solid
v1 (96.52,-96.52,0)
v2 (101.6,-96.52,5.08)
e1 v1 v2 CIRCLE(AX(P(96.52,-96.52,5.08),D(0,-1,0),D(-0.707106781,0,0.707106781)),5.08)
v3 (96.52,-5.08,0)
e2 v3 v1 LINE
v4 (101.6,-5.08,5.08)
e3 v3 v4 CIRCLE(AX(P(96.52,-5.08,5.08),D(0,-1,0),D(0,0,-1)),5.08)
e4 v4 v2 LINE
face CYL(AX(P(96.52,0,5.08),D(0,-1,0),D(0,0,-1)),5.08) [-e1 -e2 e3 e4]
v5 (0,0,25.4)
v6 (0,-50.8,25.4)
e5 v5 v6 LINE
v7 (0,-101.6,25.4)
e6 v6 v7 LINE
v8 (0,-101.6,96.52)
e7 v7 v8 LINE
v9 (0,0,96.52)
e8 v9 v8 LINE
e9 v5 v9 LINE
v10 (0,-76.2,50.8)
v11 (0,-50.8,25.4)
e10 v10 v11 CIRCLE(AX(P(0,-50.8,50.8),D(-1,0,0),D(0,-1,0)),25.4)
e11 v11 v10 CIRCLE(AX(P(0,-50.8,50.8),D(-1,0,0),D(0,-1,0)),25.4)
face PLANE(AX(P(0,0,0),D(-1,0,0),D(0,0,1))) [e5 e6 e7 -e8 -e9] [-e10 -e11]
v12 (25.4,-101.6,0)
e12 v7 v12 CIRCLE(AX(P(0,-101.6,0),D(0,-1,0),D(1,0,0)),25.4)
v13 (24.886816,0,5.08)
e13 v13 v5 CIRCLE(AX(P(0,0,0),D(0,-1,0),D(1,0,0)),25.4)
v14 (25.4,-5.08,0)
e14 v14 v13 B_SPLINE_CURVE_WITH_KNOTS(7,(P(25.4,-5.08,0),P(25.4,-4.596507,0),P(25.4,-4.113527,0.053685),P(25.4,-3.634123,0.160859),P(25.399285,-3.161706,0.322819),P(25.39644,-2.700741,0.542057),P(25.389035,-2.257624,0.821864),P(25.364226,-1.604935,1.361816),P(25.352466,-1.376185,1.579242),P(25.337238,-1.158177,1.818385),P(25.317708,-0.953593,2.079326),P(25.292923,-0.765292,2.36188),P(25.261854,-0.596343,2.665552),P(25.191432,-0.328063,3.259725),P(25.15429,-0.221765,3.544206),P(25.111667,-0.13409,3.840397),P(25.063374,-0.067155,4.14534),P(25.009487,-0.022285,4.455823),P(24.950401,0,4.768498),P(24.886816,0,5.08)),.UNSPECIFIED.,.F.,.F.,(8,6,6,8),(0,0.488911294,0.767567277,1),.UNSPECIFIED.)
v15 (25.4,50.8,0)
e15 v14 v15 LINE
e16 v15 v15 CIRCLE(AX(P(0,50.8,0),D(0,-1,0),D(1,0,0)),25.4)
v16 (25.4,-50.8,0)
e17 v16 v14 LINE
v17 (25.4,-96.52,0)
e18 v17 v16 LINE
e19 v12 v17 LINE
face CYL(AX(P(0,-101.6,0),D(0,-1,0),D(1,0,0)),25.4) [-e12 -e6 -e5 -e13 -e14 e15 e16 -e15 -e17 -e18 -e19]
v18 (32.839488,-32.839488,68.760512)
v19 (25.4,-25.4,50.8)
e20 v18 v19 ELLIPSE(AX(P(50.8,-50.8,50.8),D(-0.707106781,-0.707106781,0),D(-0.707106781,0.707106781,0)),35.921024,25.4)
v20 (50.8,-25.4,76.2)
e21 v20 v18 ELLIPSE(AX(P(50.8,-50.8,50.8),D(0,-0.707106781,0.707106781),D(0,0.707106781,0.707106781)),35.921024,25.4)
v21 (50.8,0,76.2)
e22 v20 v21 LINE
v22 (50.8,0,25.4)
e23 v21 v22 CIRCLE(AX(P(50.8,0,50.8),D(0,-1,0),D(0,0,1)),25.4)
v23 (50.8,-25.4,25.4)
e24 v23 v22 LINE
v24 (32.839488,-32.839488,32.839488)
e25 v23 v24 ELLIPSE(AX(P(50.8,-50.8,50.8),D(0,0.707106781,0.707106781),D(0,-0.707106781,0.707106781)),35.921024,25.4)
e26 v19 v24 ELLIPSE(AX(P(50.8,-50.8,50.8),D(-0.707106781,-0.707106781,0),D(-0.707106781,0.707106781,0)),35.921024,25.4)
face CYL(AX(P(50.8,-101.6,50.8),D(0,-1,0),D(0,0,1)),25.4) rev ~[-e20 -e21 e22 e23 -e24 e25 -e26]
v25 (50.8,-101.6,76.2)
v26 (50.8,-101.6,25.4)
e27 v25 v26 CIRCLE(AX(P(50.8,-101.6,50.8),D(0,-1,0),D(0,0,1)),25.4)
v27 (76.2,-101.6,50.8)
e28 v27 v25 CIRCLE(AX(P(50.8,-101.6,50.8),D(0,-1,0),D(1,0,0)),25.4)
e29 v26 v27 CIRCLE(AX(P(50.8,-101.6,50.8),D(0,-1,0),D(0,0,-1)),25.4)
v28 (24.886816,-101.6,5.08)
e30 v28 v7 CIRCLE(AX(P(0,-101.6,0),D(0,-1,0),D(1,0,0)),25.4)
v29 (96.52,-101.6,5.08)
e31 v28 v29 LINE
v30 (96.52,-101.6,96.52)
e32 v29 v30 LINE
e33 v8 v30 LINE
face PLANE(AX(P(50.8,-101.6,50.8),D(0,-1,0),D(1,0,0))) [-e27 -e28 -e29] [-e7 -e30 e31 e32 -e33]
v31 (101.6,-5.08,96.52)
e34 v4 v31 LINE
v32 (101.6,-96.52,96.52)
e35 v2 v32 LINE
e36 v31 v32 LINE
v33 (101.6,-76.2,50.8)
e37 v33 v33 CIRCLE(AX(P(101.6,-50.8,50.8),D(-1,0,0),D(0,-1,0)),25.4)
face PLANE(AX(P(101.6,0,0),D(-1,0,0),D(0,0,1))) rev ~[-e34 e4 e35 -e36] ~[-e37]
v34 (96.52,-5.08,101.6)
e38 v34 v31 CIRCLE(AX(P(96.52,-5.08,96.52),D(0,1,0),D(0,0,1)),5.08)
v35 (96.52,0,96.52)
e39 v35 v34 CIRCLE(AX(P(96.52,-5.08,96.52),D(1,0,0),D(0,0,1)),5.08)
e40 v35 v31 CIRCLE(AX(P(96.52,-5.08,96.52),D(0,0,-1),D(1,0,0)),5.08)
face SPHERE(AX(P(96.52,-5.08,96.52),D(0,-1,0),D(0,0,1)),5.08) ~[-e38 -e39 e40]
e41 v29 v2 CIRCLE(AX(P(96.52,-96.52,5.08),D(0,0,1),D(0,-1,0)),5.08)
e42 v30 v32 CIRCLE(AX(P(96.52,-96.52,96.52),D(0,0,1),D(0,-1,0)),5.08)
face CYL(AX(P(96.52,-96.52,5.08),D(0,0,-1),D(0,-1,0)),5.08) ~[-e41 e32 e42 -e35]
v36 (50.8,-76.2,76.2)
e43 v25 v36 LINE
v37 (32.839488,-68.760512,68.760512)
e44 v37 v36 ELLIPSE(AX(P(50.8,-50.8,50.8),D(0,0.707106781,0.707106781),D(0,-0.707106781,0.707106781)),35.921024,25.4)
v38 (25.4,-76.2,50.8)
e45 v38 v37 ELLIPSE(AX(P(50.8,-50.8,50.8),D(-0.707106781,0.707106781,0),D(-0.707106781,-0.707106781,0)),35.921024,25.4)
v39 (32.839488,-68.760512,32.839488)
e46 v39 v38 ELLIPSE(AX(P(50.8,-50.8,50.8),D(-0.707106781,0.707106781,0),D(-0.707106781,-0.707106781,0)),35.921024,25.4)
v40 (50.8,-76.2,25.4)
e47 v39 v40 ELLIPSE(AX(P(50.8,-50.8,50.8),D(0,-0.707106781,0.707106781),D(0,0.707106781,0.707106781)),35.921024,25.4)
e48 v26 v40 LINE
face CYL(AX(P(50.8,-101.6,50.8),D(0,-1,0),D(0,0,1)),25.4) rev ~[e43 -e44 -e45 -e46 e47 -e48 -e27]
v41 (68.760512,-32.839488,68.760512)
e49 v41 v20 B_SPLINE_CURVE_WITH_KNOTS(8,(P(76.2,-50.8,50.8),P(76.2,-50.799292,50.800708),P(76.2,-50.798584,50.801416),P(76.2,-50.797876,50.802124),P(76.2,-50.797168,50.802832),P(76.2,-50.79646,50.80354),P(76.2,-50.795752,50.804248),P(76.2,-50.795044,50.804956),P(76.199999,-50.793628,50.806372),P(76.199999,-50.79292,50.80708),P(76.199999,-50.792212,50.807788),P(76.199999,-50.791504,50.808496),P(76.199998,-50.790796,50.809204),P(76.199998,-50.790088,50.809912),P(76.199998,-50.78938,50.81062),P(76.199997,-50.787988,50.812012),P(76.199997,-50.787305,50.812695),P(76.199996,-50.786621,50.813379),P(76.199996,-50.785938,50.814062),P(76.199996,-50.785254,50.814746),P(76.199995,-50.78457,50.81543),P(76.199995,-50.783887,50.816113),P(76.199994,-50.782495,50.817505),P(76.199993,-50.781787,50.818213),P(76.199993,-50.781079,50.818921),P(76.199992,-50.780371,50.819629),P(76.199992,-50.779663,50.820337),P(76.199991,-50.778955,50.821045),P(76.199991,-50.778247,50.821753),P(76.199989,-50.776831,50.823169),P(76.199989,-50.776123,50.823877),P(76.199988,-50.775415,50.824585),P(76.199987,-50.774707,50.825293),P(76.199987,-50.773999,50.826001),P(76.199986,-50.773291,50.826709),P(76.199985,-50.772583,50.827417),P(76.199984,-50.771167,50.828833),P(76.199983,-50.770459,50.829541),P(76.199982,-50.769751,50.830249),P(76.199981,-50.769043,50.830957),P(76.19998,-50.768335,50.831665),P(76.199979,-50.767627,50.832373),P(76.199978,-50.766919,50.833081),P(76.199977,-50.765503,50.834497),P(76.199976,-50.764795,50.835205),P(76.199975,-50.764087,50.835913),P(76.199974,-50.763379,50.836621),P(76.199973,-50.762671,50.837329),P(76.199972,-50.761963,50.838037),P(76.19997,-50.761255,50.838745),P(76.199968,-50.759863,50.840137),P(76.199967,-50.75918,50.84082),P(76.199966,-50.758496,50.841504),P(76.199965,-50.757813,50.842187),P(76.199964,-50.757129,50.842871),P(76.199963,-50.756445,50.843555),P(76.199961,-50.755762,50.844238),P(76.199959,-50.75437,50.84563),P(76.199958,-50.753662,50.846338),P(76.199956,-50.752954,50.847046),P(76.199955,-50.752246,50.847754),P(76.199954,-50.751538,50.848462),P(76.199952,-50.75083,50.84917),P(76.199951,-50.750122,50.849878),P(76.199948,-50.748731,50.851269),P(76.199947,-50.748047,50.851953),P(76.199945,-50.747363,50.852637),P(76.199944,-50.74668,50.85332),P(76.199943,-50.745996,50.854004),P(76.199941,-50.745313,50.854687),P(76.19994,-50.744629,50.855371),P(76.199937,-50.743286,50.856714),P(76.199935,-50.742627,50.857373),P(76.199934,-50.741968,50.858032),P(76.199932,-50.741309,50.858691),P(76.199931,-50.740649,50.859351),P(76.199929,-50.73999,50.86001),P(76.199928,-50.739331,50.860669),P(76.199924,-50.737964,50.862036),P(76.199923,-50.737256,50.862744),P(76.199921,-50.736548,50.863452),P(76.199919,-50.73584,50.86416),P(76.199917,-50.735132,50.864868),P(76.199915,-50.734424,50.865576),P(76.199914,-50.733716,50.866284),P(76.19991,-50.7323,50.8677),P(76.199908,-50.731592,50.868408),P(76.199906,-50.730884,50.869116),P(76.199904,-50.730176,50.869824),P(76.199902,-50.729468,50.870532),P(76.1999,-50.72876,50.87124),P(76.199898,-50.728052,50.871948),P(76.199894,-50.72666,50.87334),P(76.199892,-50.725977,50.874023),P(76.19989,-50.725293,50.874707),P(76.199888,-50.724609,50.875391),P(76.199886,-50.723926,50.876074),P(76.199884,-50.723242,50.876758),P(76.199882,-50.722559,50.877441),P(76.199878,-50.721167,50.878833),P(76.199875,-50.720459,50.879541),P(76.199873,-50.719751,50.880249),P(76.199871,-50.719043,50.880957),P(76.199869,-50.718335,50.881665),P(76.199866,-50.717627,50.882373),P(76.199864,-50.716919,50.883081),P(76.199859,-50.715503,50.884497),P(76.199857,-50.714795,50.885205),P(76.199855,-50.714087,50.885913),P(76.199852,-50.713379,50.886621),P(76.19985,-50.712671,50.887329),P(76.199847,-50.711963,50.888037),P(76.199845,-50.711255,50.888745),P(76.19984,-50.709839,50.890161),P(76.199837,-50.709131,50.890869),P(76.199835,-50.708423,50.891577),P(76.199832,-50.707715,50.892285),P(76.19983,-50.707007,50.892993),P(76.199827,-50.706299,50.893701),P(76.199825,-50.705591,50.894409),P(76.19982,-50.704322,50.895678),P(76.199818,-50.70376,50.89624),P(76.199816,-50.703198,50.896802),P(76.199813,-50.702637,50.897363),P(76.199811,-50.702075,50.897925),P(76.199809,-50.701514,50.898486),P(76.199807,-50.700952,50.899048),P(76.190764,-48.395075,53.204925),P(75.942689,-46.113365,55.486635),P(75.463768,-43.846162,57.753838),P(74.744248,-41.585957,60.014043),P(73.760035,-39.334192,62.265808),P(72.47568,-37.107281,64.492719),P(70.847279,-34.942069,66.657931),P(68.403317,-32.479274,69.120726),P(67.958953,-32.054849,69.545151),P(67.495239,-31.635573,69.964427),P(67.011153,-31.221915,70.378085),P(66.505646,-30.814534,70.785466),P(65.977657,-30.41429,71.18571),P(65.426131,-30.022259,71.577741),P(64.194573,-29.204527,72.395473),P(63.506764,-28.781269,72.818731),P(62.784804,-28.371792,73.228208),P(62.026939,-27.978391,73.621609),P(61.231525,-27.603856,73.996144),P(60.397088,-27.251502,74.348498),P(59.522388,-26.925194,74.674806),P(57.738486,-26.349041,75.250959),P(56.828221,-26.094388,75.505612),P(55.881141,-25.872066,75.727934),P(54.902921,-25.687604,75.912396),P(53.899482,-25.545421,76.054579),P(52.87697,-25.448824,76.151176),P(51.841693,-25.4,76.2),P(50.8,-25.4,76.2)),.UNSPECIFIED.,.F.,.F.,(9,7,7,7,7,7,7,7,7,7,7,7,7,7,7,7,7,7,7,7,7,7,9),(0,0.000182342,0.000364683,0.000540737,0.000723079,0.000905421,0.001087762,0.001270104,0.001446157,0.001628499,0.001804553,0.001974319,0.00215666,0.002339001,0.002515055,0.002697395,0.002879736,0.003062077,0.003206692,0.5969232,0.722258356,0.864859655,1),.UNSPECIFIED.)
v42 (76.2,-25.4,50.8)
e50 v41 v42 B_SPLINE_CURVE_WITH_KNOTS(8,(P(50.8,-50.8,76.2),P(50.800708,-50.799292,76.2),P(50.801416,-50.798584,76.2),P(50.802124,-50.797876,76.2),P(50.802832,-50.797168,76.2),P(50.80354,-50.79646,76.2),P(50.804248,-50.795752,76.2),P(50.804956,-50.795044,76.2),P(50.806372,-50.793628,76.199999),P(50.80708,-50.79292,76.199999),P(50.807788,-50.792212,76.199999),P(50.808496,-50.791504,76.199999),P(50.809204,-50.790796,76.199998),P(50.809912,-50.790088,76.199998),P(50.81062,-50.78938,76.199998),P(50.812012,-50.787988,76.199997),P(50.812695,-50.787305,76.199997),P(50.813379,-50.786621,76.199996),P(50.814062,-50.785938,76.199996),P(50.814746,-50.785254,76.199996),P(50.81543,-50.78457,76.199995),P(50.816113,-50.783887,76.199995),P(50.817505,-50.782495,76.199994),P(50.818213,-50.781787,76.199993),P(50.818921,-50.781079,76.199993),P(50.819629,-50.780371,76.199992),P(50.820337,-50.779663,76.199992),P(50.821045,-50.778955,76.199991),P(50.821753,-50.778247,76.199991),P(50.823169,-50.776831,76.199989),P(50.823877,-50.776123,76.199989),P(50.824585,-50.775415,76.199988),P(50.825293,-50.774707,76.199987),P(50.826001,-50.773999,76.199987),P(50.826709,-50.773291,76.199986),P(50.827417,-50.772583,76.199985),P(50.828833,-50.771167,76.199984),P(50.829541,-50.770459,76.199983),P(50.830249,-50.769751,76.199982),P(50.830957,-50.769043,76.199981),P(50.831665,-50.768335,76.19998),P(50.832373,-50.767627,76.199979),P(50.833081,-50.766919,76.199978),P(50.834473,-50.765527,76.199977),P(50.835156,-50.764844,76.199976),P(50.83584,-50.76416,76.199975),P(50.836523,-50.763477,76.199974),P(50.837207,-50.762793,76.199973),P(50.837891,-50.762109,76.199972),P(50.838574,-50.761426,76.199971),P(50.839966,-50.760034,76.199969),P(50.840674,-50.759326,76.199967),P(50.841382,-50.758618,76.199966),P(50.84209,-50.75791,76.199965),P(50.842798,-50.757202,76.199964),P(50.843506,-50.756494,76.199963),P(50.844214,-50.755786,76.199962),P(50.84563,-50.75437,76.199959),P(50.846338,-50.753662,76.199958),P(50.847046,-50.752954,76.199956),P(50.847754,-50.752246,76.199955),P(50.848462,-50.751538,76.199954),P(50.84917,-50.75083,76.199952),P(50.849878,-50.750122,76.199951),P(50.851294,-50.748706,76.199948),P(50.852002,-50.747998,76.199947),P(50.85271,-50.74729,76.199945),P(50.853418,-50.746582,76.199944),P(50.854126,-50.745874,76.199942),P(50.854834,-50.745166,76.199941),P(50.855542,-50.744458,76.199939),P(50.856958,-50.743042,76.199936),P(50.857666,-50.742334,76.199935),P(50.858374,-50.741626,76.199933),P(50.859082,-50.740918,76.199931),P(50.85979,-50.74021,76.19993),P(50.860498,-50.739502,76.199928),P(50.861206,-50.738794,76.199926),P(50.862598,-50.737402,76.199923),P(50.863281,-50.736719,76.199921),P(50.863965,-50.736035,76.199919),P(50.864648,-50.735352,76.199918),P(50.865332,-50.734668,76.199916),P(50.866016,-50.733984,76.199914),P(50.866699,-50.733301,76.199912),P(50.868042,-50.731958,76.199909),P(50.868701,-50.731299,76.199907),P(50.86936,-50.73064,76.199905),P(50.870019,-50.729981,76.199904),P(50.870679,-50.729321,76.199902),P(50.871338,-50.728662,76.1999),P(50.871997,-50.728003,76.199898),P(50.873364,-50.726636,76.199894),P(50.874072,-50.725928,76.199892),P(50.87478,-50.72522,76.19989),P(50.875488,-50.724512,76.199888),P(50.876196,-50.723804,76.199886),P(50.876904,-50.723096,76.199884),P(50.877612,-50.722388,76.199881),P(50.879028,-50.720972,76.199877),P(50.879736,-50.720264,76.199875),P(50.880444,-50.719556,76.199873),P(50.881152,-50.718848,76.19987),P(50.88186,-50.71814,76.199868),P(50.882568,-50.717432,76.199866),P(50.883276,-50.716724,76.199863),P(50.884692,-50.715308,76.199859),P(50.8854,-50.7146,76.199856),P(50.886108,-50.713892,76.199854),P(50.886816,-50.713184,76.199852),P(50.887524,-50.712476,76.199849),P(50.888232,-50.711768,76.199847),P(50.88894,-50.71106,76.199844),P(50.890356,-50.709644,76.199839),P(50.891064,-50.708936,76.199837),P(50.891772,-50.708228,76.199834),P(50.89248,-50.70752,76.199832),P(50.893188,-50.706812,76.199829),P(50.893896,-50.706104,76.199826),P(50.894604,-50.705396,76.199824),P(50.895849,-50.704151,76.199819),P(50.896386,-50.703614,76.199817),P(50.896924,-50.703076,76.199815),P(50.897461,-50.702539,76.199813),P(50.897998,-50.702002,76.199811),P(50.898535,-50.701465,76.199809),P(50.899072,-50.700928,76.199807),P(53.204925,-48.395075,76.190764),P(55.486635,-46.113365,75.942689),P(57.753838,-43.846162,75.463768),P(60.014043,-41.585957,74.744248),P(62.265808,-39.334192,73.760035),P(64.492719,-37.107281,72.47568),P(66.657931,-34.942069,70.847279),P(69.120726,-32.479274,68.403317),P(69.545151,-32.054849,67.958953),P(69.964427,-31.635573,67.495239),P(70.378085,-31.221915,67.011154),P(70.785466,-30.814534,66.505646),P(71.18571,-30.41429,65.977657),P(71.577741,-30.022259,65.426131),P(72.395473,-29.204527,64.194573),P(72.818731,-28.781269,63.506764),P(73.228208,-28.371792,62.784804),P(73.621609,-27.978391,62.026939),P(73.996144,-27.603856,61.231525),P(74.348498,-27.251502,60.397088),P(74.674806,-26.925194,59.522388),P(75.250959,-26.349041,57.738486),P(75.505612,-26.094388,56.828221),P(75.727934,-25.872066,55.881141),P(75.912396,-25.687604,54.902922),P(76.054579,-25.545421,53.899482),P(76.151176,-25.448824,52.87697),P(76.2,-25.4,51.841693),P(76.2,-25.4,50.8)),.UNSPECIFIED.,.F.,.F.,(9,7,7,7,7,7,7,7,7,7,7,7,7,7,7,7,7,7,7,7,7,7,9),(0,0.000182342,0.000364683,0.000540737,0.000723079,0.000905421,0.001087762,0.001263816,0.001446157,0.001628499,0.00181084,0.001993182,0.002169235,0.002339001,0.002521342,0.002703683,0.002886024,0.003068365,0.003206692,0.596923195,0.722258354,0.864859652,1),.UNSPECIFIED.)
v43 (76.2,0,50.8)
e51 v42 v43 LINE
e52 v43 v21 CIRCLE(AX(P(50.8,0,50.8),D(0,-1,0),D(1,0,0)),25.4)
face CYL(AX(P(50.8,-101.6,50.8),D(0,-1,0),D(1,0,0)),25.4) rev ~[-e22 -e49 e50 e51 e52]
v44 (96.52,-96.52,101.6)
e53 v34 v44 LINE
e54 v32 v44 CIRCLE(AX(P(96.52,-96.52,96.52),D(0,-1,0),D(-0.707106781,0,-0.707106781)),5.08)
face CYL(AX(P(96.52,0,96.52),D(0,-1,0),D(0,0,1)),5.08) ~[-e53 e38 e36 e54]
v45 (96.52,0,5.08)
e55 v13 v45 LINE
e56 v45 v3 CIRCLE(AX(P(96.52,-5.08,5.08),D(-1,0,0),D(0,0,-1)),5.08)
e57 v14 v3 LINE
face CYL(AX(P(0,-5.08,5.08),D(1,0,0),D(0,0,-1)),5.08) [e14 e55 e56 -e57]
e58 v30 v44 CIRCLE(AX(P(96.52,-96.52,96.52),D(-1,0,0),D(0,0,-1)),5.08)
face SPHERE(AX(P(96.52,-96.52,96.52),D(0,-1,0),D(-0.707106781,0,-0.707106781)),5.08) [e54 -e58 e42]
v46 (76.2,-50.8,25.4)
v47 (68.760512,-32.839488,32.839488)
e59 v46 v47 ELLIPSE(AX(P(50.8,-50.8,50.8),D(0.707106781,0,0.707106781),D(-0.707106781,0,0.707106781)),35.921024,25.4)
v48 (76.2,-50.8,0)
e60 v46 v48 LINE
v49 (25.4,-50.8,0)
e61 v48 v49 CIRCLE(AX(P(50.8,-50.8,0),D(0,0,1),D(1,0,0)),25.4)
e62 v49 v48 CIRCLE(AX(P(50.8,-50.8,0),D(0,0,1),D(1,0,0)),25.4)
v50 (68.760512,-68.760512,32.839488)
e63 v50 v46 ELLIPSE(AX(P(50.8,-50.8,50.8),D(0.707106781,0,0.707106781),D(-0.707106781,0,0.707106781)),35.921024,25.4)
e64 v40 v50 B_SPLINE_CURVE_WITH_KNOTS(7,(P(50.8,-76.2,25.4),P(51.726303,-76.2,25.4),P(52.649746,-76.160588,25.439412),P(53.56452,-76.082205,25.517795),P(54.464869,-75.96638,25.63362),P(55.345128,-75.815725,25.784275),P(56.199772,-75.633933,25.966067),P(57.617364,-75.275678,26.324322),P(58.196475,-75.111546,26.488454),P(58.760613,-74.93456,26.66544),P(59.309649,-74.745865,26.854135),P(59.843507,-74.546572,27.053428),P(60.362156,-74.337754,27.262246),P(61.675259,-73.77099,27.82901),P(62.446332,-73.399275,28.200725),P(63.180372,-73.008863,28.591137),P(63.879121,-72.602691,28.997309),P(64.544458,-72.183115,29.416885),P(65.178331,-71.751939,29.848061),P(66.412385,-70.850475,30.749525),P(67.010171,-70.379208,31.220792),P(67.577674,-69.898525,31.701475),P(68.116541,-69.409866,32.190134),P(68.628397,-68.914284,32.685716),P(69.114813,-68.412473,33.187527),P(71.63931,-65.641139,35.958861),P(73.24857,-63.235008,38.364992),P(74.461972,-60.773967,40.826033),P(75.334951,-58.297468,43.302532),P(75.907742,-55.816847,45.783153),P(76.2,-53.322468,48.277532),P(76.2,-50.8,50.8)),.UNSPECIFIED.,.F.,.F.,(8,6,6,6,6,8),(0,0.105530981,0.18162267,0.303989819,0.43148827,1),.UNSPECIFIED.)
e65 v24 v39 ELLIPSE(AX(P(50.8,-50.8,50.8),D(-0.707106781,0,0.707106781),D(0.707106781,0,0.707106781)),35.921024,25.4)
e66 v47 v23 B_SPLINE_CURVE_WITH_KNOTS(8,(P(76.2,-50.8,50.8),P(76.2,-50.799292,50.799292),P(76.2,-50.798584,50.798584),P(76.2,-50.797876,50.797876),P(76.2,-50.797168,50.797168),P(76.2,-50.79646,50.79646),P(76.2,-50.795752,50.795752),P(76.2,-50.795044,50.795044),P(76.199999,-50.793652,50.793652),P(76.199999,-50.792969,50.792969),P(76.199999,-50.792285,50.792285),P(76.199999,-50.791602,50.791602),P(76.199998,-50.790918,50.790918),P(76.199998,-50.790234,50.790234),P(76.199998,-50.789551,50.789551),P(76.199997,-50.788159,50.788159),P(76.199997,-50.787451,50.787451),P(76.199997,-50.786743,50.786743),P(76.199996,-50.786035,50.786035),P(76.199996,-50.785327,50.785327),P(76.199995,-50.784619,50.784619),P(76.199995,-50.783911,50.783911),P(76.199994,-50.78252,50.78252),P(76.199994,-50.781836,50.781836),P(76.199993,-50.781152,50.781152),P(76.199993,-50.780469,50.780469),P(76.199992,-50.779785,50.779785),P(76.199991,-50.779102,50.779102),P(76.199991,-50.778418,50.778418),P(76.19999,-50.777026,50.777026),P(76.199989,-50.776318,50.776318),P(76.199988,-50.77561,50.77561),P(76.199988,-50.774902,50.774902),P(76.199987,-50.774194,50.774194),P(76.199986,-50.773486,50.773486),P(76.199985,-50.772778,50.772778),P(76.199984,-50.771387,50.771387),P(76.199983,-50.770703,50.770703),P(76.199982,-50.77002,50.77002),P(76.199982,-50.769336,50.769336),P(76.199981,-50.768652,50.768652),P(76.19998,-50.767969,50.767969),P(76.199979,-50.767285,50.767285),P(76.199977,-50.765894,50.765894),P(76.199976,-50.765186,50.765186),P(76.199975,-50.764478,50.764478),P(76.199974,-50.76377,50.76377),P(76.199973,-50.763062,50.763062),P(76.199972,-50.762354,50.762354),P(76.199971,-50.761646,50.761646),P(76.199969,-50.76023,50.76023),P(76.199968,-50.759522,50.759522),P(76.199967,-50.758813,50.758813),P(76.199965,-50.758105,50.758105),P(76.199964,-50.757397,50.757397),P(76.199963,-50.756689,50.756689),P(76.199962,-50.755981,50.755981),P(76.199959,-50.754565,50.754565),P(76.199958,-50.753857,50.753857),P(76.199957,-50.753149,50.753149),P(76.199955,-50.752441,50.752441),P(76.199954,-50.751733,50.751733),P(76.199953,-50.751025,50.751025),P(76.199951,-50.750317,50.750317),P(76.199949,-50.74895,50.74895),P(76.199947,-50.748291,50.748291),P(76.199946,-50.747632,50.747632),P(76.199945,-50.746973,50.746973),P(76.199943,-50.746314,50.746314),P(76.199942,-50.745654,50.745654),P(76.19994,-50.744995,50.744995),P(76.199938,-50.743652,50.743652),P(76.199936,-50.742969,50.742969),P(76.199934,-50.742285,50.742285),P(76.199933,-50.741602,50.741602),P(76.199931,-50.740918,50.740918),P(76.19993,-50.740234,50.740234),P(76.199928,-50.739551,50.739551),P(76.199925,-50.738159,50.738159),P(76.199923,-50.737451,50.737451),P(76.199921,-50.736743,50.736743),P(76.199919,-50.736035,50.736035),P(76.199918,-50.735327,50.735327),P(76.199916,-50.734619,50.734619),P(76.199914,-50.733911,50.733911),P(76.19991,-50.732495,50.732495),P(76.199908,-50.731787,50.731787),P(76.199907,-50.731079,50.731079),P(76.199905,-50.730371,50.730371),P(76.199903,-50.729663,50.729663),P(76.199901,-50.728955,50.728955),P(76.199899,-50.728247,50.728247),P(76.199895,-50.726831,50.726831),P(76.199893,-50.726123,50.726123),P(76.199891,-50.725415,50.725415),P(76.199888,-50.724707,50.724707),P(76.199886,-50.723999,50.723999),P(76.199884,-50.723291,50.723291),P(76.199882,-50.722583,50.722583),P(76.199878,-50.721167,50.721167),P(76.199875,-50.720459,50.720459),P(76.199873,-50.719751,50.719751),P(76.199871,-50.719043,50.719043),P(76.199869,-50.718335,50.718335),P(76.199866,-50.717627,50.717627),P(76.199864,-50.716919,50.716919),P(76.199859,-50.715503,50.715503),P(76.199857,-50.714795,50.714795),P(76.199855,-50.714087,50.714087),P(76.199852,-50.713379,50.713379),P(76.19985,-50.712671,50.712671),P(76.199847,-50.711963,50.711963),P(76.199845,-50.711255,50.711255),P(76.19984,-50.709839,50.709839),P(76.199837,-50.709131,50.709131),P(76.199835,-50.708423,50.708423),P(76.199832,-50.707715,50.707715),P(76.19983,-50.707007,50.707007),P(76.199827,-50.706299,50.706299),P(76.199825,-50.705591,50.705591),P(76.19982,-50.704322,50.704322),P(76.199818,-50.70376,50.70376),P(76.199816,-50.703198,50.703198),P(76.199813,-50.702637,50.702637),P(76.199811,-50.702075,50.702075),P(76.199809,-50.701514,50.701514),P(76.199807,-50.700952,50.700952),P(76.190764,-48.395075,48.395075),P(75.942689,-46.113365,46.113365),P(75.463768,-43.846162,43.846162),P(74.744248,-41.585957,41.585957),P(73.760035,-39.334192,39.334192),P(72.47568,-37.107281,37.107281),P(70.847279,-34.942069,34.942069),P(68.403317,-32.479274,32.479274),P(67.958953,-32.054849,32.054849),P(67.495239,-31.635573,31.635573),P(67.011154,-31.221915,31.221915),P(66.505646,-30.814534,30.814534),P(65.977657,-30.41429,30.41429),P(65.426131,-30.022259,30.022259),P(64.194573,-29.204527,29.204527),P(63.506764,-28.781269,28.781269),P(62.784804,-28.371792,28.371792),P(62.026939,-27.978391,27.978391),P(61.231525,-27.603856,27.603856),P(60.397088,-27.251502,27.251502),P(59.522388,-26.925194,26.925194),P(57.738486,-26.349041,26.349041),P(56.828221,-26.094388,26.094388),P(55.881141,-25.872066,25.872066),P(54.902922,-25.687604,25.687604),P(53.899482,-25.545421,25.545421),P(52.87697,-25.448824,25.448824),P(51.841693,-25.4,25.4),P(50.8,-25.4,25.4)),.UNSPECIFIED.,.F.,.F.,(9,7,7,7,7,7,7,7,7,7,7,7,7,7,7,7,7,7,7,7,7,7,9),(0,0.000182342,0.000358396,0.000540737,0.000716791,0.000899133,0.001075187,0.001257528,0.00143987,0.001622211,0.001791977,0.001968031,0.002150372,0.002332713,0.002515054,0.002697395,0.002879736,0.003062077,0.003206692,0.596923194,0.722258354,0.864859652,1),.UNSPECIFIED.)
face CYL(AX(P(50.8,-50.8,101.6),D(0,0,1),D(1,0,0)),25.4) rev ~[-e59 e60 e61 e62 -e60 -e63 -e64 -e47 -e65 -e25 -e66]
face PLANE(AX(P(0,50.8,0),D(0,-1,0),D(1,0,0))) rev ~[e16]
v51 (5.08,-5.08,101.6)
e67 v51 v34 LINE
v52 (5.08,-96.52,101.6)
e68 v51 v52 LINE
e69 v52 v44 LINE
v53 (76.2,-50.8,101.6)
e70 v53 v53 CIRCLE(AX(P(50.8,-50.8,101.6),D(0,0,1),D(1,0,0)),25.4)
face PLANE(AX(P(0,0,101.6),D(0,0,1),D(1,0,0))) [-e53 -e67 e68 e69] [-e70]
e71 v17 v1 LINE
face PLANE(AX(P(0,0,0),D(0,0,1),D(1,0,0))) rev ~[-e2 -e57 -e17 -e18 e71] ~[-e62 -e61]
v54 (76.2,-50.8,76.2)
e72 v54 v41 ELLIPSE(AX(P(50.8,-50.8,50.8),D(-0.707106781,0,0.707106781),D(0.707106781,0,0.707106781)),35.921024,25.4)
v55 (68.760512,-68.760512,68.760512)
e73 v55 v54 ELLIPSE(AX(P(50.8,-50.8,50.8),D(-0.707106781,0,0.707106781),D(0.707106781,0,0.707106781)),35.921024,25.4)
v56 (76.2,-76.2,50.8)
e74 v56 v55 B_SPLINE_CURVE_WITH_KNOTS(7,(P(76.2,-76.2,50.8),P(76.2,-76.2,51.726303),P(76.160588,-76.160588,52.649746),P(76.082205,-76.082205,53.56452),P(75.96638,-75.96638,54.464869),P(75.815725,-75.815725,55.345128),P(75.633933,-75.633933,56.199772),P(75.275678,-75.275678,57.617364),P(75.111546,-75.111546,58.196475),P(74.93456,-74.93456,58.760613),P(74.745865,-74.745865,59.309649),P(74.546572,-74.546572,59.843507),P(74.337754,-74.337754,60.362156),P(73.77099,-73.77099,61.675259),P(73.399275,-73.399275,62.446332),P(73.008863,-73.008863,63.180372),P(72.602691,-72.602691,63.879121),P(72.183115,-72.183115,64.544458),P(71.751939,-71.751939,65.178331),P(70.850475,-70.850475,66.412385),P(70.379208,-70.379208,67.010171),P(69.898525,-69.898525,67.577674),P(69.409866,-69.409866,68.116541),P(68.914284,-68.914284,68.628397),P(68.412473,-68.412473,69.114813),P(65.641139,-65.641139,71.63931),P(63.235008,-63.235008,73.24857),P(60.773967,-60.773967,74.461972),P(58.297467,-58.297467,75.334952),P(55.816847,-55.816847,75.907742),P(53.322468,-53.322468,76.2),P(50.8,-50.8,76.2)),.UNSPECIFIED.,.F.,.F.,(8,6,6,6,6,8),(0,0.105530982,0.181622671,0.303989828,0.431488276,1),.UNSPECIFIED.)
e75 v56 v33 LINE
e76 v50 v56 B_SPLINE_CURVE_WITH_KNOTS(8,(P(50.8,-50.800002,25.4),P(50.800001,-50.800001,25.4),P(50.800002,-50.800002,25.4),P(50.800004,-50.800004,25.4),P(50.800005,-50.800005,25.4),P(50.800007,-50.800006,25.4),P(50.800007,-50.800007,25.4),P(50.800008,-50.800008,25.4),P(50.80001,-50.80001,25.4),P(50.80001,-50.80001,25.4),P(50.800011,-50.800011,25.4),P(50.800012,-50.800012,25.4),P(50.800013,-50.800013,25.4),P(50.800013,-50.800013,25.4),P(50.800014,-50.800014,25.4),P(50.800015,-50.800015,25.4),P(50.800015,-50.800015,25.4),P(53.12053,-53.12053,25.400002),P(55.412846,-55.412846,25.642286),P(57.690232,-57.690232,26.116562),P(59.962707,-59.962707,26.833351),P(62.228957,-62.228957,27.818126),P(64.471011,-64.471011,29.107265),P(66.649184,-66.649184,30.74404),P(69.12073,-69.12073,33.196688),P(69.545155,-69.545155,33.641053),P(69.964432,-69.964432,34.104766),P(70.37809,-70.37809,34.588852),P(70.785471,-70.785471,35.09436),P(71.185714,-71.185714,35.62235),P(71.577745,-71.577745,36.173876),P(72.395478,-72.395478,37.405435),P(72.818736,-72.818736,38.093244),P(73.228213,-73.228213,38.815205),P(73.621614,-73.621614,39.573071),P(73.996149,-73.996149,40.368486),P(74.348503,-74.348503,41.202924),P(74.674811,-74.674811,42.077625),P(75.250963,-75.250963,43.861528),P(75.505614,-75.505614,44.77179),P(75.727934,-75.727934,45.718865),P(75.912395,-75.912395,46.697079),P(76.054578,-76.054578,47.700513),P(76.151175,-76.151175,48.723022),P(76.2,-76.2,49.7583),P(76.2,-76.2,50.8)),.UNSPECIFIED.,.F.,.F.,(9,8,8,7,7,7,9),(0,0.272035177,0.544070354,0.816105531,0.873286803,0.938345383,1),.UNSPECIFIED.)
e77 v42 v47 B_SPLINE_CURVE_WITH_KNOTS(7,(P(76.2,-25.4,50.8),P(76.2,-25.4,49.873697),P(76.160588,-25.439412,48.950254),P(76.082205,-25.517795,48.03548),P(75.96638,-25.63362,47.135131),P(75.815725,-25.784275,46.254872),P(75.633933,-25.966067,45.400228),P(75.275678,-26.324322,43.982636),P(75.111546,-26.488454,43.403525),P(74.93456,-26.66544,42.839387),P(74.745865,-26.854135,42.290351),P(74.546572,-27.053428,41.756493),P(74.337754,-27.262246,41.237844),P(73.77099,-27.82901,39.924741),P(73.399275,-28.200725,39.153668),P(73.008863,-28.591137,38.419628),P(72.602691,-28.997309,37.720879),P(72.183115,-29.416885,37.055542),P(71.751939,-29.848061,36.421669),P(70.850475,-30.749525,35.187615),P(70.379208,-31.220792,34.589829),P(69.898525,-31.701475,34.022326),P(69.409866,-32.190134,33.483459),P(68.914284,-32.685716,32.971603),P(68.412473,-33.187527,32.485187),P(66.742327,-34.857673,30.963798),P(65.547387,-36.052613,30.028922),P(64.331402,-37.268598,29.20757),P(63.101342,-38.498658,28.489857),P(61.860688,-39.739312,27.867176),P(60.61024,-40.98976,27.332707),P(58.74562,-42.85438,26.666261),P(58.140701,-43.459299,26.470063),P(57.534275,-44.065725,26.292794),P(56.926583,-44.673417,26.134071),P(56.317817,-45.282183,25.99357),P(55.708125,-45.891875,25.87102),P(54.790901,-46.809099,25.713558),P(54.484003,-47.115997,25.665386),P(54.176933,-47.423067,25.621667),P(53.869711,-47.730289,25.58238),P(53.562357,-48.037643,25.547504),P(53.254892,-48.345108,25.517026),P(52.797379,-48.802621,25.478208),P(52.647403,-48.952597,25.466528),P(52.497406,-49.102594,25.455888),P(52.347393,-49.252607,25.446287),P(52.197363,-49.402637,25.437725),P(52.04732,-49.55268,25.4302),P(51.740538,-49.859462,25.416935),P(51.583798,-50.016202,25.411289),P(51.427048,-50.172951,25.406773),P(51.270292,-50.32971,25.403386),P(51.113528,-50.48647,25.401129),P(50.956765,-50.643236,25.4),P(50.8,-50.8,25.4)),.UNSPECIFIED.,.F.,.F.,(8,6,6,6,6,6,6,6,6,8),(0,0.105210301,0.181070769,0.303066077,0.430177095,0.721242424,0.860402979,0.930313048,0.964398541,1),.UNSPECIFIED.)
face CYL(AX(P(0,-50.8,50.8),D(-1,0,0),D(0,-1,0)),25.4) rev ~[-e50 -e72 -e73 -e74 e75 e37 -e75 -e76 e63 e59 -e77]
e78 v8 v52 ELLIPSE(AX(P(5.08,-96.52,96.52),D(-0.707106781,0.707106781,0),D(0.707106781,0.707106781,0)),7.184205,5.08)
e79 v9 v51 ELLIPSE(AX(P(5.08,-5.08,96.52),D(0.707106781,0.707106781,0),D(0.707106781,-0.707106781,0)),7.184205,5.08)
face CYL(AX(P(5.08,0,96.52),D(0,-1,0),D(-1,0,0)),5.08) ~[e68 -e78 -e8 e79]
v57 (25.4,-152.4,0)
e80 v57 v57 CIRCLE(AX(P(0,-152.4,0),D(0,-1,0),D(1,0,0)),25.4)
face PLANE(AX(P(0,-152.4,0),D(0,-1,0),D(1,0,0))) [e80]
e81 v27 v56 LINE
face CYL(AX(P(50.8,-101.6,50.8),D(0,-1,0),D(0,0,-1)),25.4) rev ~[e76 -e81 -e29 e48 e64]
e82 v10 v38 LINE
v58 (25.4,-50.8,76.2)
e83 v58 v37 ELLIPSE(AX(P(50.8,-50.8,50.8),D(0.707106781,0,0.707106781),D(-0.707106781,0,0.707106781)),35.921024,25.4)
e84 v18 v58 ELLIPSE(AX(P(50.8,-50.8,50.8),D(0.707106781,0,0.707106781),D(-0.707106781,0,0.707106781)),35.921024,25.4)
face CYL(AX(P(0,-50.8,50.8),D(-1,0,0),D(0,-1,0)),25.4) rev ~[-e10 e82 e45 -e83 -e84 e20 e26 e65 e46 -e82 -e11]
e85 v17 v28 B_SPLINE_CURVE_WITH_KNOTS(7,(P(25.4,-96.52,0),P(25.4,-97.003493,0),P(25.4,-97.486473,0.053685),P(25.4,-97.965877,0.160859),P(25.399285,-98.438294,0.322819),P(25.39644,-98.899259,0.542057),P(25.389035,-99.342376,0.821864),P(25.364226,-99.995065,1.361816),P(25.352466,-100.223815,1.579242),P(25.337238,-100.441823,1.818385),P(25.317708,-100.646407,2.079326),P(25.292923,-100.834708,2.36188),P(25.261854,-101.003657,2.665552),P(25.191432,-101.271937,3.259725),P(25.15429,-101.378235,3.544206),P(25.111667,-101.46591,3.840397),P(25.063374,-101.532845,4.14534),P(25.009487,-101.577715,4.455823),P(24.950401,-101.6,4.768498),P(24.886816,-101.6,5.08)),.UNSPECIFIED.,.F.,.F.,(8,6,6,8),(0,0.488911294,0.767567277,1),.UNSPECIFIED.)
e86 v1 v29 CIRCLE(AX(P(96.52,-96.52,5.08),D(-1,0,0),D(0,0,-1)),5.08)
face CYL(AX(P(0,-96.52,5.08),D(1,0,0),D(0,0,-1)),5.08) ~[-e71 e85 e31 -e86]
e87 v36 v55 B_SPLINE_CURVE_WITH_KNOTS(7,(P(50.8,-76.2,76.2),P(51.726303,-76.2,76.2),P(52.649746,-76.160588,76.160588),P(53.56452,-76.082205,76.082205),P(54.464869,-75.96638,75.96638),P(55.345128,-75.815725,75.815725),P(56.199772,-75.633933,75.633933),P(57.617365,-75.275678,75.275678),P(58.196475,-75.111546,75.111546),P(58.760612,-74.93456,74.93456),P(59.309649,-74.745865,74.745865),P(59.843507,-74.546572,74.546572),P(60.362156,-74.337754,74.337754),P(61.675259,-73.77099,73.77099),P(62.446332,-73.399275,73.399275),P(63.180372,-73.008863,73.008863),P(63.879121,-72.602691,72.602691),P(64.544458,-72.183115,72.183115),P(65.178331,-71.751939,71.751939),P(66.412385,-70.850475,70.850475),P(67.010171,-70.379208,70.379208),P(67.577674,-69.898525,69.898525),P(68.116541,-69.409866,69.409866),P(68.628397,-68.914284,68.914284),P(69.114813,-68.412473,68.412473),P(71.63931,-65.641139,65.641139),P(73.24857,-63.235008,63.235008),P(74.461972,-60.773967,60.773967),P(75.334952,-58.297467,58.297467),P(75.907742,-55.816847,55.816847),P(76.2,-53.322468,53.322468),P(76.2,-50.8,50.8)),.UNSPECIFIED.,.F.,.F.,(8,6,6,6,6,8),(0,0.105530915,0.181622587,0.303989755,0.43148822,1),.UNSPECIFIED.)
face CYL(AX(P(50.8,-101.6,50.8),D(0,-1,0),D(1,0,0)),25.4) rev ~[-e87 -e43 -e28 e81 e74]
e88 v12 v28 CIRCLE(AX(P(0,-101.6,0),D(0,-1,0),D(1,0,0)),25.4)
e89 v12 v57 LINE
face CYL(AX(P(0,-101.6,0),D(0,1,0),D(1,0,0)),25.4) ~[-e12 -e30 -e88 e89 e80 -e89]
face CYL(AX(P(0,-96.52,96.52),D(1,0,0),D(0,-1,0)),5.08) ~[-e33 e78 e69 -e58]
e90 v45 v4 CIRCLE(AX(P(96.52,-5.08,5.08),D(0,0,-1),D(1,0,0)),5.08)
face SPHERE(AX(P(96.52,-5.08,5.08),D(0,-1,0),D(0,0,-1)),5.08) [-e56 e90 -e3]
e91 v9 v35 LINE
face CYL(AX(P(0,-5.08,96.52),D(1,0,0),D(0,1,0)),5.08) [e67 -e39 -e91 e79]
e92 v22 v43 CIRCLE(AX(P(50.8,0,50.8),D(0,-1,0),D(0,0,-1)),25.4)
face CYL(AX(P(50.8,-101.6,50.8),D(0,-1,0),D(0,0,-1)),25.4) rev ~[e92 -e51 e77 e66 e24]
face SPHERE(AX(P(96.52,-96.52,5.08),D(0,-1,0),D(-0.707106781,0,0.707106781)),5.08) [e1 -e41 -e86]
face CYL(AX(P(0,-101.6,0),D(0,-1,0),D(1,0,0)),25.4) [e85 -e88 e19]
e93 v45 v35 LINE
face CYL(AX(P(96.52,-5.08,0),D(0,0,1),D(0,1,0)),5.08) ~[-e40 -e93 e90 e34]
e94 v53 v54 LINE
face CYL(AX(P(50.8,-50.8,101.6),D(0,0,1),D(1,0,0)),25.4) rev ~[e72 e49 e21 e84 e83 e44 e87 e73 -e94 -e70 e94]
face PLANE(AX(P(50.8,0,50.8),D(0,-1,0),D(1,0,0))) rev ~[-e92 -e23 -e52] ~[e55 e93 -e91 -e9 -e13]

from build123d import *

# Parameters (mm, degrees)
F0_W           = 101.6
F0_H           = 101.6
F1_DEPTH       = 101.6
F2_R           = 25.4
F3_DEPTH       = 101.6
F4_R           = 25.4
F5_DEPTH       = 101.6
F7_DEPTH       = 101.6
F8_R           = 5.08
F10_T1_DEPTH   = 91.44
F10_S5_W       = 5.08
F10_S5_H       = 5.08
F10_T6_DEPTH   = 5.08
F10_S11_W      = 5.08
F10_S11_H      = 5.08
F10_T12_DEPTH  = 5.08
F11_R          = 25.4
F12_DEPTH      = 50.8
F12_DEPTH_BACK = 152.4


# Not quite as in the source:
# - a fillet or chamfer that OpenCascade refuses, or shapes differently, is made with other operations: its cross-section is extruded or revolved along the edge and cut away or added


with BuildPart() as f1:
    # F0 (on Front) → F1 (new body)
    with BuildSketch(Plane.XZ):
        with Locations((50.8, 50.8)):
            Rectangle(F0_W, F0_H)
    extrude(amount=F1_DEPTH)

    # F2 (on face) → F3 (cut)
    with BuildSketch(Plane.XY.offset(101.6)):
        with Locations((50.8, -50.8)):
            Circle(F2_R)
    extrude(amount=-F3_DEPTH, mode=Mode.SUBTRACT)

    # F4 (on face) → F5 (cut)
    with BuildSketch(Plane(origin=(0, 0, 0), x_dir=(0, -1, 0), z_dir=(-1, 0, 0))):
        with Locations((50.8, 50.8)):
            Circle(F4_R)
    extrude(amount=-F5_DEPTH, mode=Mode.SUBTRACT)

    # F6 (on face) → F7 (cut)
    with BuildSketch(Plane.XZ.offset(101.6)):
        with BuildLine():
            ThreePointArc((76.2, 50.8), (68.7605122421, 68.7605122421), (50.8, 76.2))
            Line((50.8, 76.2), (50.8, 25.4))
            ThreePointArc((50.8, 25.4), (68.7605122421, 32.8394877579), (76.2, 50.8))
        make_face()
        with BuildLine():
            Line((50.8, 25.4), (50.8, 76.2))
            ThreePointArc((50.8, 76.2), (25.4, 50.8), (50.8, 25.4))
        make_face()
    extrude(amount=-F7_DEPTH, mode=Mode.SUBTRACT)

    # F8
    f8_edges = [f1.edges().sort_by_distance(p)[0] for p in [
        (50.8, -101.6, 101.6),
        (101.6, -50.8, 101.6),
        (50.8, 0, 101.6),
        (0, -50.8, 101.6),
        (101.6, -50.8, 0),
        (50.8, -101.6, 0),
        (0, -50.8, 0),
        (50.8, 0, 0),
        (101.6, 0, 50.8),
    ]]
    fillet(f8_edges, radius=F8_R)

    # F10: fillet of radius 5.08 on 1 edges, made by hand

    # F10_s2 → F10_t1 (cut)
    with BuildSketch(Plane.XY.offset(5.08)):
        with BuildLine():
            ThreePointArc((96.52, -101.6), (100.1121024484, -100.1121024484), (101.6, -96.52))
            Line((101.6, -96.52), (101.6, -101.6))
            Line((101.6, -101.6), (96.52, -101.6))
        make_face()
    extrude(amount=F10_T1_DEPTH, mode=Mode.SUBTRACT)


with BuildPart() as f10_tool4:
    # F10_s5 → F10_t6 (new body)
    with BuildSketch(Plane.XZ.offset(96.52)):
        with Locations((99.06, 2.54)):
            Rectangle(F10_S5_W, F10_S5_H)
    extrude(amount=F10_T6_DEPTH)

    # F10_s7 → F10_t8 (revolve, cut)
    with BuildSketch(Plane(origin=(96.52, -96.52, 5.08), x_dir=(-0.7071067812, 0, 0.7071067812), z_dir=(0.7071067812, 0, 0.7071067812))):
        with BuildLine():
            ThreePointArc((0, -5.08), (5.08, 0), (0, 5.08))
            Line((0, 5.08), (0, -5.08))
        make_face()
    revolve(axis=Axis((96.52, -96.52, 5.08), (0, -1, 0)), mode=Mode.SUBTRACT)


with BuildPart() as f1_1:
    add(f1.part)

    # F10_t3: cut F10_tool4
    add(f10_tool4.part, mode=Mode.SUBTRACT)


with BuildPart() as f10_tool10:
    # F10_s11 → F10_t12 (new body)
    with BuildSketch(Plane.XZ.offset(96.52)):
        with Locations((99.06, 99.06)):
            Rectangle(F10_S11_W, F10_S11_H)
    extrude(amount=F10_T12_DEPTH)

    # F10_s13 → F10_t14 (revolve, cut)
    with BuildSketch(Plane(origin=(96.52, -96.52, 96.52), x_dir=(-0.7071067812, 0, -0.7071067812), z_dir=(-0.7071067812, 0, 0.7071067812))):
        with BuildLine():
            ThreePointArc((0, -5.08), (5.08, 0), (0, 5.08))
            Line((0, 5.08), (0, -5.08))
        make_face()
    revolve(axis=Axis((96.52, -96.52, 96.52), (0, -1, 0)), mode=Mode.SUBTRACT)


with BuildPart() as f1_2:
    add(f1_1.part)

    # F10_t9: cut F10_tool10
    add(f10_tool10.part, mode=Mode.SUBTRACT)

    # F11 (on offset) → F12 (join, two sides)
    with BuildSketch(Plane.XZ.offset(101.6)) as f12_sk:
        Circle(F11_R)
    extrude(amount=F12_DEPTH)
    extrude(f12_sk.sketch, amount=-F12_DEPTH_BACK)


solid = f1_2.part
